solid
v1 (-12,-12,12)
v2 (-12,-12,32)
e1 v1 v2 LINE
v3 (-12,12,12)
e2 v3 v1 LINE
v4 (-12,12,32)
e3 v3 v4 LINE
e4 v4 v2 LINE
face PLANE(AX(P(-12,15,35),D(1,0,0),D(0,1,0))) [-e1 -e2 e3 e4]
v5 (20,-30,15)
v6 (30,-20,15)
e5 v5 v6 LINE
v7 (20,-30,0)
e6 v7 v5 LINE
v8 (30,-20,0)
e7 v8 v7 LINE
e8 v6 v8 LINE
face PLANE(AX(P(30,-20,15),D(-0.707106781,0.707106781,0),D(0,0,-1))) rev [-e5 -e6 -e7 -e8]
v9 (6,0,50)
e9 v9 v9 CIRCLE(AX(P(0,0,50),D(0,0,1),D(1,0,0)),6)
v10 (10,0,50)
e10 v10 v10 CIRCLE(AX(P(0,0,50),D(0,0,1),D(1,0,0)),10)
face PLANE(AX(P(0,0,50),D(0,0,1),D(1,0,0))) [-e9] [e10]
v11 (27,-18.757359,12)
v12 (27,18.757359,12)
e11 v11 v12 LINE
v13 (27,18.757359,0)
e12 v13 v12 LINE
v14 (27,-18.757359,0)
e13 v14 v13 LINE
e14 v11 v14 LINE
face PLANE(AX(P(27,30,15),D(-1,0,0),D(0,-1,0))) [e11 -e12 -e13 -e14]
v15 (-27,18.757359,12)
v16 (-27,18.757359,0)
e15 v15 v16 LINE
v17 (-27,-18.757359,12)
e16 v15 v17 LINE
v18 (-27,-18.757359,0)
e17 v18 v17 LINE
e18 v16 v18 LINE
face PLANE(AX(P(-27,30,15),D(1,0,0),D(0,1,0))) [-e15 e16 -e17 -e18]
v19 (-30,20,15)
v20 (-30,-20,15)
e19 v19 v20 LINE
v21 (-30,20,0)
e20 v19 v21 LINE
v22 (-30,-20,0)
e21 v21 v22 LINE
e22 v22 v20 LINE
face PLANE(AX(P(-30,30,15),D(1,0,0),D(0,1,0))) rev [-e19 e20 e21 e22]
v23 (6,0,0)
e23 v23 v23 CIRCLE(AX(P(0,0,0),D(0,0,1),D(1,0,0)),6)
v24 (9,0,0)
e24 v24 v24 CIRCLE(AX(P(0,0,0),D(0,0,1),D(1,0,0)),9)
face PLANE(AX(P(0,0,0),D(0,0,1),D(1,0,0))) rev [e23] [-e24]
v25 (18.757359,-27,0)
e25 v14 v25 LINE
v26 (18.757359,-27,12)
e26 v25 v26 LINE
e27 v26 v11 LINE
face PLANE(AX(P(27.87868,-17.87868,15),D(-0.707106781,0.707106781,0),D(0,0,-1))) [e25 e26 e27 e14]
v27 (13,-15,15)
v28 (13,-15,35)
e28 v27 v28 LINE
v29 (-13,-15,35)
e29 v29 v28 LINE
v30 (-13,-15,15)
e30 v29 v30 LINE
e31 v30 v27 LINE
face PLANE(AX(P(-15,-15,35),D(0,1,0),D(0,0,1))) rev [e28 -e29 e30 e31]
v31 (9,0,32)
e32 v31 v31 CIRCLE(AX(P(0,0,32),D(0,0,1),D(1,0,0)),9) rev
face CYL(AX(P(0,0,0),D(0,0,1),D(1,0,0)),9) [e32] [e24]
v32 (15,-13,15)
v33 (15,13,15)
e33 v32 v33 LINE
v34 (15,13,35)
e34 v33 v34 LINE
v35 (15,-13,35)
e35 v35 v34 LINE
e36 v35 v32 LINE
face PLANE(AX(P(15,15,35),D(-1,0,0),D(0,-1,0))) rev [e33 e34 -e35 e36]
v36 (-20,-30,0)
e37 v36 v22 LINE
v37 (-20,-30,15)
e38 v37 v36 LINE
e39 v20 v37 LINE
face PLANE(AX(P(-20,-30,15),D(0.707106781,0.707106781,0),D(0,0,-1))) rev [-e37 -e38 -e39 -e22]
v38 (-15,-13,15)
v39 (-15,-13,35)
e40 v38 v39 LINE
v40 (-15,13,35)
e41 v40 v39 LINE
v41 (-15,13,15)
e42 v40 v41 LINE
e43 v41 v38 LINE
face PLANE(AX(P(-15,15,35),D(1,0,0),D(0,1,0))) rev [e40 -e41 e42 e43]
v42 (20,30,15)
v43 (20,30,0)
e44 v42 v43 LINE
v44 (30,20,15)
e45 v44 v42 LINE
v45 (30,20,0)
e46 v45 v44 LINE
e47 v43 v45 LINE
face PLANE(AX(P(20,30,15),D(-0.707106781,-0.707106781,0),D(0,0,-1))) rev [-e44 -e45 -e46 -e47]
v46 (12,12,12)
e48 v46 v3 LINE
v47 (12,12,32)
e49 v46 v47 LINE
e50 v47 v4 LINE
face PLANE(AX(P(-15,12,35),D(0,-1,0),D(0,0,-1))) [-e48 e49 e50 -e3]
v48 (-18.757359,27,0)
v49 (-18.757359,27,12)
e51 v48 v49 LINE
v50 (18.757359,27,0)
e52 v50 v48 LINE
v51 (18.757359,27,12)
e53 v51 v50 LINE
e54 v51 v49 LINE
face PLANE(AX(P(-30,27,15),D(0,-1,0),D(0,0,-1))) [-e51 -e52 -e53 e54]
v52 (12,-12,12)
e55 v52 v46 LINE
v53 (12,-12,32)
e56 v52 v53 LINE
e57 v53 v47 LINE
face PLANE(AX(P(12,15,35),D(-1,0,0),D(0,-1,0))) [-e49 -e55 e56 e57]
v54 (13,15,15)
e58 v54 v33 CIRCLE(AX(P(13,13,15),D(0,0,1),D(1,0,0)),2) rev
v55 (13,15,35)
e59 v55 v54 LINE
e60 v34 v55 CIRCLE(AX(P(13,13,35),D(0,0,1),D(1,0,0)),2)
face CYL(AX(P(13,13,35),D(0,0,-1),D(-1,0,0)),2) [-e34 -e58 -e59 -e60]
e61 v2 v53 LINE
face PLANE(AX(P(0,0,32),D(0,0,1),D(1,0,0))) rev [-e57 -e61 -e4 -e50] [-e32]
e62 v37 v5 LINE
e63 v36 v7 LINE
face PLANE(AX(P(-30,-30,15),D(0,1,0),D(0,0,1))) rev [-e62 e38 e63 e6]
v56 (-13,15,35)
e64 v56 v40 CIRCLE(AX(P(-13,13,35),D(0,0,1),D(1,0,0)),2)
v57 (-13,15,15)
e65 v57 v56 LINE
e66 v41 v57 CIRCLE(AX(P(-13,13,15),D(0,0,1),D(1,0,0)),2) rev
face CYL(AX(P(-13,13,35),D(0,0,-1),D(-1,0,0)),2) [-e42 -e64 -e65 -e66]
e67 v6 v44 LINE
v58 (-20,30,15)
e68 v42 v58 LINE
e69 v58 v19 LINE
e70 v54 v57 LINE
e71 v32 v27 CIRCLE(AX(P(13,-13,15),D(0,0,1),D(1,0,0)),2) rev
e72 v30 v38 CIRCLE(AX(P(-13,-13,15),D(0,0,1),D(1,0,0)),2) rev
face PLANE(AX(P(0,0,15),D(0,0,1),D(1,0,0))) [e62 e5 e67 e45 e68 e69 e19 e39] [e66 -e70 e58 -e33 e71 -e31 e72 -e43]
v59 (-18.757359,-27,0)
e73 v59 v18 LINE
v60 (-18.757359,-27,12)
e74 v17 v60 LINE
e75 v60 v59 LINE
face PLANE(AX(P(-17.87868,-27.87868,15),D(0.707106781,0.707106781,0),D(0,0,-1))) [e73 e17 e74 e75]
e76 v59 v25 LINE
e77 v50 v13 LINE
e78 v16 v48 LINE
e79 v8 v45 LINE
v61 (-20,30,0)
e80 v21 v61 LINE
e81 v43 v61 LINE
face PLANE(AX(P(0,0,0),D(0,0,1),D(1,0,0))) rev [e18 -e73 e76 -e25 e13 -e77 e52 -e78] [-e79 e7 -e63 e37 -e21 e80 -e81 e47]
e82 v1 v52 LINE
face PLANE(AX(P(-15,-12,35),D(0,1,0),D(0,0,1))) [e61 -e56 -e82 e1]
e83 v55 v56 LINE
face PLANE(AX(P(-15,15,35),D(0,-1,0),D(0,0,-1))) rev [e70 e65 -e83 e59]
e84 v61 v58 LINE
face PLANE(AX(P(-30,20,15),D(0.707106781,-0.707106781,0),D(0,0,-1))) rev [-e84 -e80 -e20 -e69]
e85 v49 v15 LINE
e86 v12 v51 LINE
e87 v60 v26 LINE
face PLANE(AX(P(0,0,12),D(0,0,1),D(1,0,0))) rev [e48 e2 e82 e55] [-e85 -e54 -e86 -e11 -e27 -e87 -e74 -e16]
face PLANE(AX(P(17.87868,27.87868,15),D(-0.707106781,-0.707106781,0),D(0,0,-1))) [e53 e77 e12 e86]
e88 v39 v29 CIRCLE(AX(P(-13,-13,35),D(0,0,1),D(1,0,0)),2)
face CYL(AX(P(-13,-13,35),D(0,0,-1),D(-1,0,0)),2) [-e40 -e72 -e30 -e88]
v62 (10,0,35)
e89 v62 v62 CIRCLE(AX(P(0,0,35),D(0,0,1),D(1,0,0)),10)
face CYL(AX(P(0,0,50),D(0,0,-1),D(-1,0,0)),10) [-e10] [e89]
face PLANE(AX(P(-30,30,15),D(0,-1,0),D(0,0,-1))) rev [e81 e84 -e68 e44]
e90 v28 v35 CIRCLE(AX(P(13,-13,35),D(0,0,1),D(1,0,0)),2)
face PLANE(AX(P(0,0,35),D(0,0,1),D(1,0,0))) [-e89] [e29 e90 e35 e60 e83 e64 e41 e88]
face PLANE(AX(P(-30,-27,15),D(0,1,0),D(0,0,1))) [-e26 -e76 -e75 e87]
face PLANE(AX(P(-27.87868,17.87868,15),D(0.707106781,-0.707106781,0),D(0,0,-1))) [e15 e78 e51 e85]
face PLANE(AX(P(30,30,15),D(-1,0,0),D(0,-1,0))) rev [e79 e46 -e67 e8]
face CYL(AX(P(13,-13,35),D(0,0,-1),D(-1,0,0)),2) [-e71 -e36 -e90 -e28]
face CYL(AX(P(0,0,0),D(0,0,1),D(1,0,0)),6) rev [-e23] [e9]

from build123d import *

# Parameters (mm, degrees)
SKETCH1_W           = 60
SKETCH1_H           = 60
BOSS_EXTRUDE1_DEPTH = 15
SKETCH2_W           = 30
SKETCH2_H           = 30
BOSS_EXTRUDE2_DEPTH = 20
SKETCH3_R           = 10
BOSS_EXTRUDE3_DEPTH = 15
SKETCH4_R           = 6
CUT_EXTRUDE1_DEPTH  = 66.574385243
CHAMFER1_SIZE       = 10
FILLET1_R           = 2
SHELL1_T            = -3


with BuildPart() as part:
    # Sketch1 → Boss-Extrude1 (new body)
    with BuildSketch(Plane.XY):
        Rectangle(SKETCH1_W, SKETCH1_H)
    extrude(amount=BOSS_EXTRUDE1_DEPTH)

    # Sketch2 → Boss-Extrude2 (add)
    with BuildSketch(Plane.XY.offset(15)):
        Rectangle(SKETCH2_W, SKETCH2_H)
    extrude(amount=BOSS_EXTRUDE2_DEPTH)

    # Sketch3 → Boss-Extrude3 (add)
    with BuildSketch(Plane.XY.offset(35)):
        Circle(SKETCH3_R)
    extrude(amount=BOSS_EXTRUDE3_DEPTH)

    # Sketch4 → Cut-Extrude1 (cut, through all)
    with BuildSketch(Plane.XY.offset(50)):
        Circle(SKETCH4_R)
    extrude(amount=-CUT_EXTRUDE1_DEPTH, mode=Mode.SUBTRACT)

    # Chamfer1
    chamfer1_edges = [part.edges().sort_by_distance(p)[0] for p in [
        (30, 30, 7.5),
        (30, -30, 7.5),
        (-30, -30, 7.5),
        (-30, 30, 7.5),
    ]]
    chamfer(chamfer1_edges, length=CHAMFER1_SIZE)

    # Fillet1
    fillet1_edges = [part.edges().sort_by_distance(p)[0] for p in [
        (15, -15, 25),
        (15, 15, 25),
        (-15, 15, 25),
        (-15, -15, 25),
    ]]
    fillet(fillet1_edges, radius=FILLET1_R)

    # Shell1
    shell1_openings = [part.faces().sort_by_distance(p)[0] for p in [
        (0, 29.151471863, 0),
    ]]
    offset(amount=SHELL1_T, openings=shell1_openings, kind=Kind.INTERSECTION)


solid = part.part
